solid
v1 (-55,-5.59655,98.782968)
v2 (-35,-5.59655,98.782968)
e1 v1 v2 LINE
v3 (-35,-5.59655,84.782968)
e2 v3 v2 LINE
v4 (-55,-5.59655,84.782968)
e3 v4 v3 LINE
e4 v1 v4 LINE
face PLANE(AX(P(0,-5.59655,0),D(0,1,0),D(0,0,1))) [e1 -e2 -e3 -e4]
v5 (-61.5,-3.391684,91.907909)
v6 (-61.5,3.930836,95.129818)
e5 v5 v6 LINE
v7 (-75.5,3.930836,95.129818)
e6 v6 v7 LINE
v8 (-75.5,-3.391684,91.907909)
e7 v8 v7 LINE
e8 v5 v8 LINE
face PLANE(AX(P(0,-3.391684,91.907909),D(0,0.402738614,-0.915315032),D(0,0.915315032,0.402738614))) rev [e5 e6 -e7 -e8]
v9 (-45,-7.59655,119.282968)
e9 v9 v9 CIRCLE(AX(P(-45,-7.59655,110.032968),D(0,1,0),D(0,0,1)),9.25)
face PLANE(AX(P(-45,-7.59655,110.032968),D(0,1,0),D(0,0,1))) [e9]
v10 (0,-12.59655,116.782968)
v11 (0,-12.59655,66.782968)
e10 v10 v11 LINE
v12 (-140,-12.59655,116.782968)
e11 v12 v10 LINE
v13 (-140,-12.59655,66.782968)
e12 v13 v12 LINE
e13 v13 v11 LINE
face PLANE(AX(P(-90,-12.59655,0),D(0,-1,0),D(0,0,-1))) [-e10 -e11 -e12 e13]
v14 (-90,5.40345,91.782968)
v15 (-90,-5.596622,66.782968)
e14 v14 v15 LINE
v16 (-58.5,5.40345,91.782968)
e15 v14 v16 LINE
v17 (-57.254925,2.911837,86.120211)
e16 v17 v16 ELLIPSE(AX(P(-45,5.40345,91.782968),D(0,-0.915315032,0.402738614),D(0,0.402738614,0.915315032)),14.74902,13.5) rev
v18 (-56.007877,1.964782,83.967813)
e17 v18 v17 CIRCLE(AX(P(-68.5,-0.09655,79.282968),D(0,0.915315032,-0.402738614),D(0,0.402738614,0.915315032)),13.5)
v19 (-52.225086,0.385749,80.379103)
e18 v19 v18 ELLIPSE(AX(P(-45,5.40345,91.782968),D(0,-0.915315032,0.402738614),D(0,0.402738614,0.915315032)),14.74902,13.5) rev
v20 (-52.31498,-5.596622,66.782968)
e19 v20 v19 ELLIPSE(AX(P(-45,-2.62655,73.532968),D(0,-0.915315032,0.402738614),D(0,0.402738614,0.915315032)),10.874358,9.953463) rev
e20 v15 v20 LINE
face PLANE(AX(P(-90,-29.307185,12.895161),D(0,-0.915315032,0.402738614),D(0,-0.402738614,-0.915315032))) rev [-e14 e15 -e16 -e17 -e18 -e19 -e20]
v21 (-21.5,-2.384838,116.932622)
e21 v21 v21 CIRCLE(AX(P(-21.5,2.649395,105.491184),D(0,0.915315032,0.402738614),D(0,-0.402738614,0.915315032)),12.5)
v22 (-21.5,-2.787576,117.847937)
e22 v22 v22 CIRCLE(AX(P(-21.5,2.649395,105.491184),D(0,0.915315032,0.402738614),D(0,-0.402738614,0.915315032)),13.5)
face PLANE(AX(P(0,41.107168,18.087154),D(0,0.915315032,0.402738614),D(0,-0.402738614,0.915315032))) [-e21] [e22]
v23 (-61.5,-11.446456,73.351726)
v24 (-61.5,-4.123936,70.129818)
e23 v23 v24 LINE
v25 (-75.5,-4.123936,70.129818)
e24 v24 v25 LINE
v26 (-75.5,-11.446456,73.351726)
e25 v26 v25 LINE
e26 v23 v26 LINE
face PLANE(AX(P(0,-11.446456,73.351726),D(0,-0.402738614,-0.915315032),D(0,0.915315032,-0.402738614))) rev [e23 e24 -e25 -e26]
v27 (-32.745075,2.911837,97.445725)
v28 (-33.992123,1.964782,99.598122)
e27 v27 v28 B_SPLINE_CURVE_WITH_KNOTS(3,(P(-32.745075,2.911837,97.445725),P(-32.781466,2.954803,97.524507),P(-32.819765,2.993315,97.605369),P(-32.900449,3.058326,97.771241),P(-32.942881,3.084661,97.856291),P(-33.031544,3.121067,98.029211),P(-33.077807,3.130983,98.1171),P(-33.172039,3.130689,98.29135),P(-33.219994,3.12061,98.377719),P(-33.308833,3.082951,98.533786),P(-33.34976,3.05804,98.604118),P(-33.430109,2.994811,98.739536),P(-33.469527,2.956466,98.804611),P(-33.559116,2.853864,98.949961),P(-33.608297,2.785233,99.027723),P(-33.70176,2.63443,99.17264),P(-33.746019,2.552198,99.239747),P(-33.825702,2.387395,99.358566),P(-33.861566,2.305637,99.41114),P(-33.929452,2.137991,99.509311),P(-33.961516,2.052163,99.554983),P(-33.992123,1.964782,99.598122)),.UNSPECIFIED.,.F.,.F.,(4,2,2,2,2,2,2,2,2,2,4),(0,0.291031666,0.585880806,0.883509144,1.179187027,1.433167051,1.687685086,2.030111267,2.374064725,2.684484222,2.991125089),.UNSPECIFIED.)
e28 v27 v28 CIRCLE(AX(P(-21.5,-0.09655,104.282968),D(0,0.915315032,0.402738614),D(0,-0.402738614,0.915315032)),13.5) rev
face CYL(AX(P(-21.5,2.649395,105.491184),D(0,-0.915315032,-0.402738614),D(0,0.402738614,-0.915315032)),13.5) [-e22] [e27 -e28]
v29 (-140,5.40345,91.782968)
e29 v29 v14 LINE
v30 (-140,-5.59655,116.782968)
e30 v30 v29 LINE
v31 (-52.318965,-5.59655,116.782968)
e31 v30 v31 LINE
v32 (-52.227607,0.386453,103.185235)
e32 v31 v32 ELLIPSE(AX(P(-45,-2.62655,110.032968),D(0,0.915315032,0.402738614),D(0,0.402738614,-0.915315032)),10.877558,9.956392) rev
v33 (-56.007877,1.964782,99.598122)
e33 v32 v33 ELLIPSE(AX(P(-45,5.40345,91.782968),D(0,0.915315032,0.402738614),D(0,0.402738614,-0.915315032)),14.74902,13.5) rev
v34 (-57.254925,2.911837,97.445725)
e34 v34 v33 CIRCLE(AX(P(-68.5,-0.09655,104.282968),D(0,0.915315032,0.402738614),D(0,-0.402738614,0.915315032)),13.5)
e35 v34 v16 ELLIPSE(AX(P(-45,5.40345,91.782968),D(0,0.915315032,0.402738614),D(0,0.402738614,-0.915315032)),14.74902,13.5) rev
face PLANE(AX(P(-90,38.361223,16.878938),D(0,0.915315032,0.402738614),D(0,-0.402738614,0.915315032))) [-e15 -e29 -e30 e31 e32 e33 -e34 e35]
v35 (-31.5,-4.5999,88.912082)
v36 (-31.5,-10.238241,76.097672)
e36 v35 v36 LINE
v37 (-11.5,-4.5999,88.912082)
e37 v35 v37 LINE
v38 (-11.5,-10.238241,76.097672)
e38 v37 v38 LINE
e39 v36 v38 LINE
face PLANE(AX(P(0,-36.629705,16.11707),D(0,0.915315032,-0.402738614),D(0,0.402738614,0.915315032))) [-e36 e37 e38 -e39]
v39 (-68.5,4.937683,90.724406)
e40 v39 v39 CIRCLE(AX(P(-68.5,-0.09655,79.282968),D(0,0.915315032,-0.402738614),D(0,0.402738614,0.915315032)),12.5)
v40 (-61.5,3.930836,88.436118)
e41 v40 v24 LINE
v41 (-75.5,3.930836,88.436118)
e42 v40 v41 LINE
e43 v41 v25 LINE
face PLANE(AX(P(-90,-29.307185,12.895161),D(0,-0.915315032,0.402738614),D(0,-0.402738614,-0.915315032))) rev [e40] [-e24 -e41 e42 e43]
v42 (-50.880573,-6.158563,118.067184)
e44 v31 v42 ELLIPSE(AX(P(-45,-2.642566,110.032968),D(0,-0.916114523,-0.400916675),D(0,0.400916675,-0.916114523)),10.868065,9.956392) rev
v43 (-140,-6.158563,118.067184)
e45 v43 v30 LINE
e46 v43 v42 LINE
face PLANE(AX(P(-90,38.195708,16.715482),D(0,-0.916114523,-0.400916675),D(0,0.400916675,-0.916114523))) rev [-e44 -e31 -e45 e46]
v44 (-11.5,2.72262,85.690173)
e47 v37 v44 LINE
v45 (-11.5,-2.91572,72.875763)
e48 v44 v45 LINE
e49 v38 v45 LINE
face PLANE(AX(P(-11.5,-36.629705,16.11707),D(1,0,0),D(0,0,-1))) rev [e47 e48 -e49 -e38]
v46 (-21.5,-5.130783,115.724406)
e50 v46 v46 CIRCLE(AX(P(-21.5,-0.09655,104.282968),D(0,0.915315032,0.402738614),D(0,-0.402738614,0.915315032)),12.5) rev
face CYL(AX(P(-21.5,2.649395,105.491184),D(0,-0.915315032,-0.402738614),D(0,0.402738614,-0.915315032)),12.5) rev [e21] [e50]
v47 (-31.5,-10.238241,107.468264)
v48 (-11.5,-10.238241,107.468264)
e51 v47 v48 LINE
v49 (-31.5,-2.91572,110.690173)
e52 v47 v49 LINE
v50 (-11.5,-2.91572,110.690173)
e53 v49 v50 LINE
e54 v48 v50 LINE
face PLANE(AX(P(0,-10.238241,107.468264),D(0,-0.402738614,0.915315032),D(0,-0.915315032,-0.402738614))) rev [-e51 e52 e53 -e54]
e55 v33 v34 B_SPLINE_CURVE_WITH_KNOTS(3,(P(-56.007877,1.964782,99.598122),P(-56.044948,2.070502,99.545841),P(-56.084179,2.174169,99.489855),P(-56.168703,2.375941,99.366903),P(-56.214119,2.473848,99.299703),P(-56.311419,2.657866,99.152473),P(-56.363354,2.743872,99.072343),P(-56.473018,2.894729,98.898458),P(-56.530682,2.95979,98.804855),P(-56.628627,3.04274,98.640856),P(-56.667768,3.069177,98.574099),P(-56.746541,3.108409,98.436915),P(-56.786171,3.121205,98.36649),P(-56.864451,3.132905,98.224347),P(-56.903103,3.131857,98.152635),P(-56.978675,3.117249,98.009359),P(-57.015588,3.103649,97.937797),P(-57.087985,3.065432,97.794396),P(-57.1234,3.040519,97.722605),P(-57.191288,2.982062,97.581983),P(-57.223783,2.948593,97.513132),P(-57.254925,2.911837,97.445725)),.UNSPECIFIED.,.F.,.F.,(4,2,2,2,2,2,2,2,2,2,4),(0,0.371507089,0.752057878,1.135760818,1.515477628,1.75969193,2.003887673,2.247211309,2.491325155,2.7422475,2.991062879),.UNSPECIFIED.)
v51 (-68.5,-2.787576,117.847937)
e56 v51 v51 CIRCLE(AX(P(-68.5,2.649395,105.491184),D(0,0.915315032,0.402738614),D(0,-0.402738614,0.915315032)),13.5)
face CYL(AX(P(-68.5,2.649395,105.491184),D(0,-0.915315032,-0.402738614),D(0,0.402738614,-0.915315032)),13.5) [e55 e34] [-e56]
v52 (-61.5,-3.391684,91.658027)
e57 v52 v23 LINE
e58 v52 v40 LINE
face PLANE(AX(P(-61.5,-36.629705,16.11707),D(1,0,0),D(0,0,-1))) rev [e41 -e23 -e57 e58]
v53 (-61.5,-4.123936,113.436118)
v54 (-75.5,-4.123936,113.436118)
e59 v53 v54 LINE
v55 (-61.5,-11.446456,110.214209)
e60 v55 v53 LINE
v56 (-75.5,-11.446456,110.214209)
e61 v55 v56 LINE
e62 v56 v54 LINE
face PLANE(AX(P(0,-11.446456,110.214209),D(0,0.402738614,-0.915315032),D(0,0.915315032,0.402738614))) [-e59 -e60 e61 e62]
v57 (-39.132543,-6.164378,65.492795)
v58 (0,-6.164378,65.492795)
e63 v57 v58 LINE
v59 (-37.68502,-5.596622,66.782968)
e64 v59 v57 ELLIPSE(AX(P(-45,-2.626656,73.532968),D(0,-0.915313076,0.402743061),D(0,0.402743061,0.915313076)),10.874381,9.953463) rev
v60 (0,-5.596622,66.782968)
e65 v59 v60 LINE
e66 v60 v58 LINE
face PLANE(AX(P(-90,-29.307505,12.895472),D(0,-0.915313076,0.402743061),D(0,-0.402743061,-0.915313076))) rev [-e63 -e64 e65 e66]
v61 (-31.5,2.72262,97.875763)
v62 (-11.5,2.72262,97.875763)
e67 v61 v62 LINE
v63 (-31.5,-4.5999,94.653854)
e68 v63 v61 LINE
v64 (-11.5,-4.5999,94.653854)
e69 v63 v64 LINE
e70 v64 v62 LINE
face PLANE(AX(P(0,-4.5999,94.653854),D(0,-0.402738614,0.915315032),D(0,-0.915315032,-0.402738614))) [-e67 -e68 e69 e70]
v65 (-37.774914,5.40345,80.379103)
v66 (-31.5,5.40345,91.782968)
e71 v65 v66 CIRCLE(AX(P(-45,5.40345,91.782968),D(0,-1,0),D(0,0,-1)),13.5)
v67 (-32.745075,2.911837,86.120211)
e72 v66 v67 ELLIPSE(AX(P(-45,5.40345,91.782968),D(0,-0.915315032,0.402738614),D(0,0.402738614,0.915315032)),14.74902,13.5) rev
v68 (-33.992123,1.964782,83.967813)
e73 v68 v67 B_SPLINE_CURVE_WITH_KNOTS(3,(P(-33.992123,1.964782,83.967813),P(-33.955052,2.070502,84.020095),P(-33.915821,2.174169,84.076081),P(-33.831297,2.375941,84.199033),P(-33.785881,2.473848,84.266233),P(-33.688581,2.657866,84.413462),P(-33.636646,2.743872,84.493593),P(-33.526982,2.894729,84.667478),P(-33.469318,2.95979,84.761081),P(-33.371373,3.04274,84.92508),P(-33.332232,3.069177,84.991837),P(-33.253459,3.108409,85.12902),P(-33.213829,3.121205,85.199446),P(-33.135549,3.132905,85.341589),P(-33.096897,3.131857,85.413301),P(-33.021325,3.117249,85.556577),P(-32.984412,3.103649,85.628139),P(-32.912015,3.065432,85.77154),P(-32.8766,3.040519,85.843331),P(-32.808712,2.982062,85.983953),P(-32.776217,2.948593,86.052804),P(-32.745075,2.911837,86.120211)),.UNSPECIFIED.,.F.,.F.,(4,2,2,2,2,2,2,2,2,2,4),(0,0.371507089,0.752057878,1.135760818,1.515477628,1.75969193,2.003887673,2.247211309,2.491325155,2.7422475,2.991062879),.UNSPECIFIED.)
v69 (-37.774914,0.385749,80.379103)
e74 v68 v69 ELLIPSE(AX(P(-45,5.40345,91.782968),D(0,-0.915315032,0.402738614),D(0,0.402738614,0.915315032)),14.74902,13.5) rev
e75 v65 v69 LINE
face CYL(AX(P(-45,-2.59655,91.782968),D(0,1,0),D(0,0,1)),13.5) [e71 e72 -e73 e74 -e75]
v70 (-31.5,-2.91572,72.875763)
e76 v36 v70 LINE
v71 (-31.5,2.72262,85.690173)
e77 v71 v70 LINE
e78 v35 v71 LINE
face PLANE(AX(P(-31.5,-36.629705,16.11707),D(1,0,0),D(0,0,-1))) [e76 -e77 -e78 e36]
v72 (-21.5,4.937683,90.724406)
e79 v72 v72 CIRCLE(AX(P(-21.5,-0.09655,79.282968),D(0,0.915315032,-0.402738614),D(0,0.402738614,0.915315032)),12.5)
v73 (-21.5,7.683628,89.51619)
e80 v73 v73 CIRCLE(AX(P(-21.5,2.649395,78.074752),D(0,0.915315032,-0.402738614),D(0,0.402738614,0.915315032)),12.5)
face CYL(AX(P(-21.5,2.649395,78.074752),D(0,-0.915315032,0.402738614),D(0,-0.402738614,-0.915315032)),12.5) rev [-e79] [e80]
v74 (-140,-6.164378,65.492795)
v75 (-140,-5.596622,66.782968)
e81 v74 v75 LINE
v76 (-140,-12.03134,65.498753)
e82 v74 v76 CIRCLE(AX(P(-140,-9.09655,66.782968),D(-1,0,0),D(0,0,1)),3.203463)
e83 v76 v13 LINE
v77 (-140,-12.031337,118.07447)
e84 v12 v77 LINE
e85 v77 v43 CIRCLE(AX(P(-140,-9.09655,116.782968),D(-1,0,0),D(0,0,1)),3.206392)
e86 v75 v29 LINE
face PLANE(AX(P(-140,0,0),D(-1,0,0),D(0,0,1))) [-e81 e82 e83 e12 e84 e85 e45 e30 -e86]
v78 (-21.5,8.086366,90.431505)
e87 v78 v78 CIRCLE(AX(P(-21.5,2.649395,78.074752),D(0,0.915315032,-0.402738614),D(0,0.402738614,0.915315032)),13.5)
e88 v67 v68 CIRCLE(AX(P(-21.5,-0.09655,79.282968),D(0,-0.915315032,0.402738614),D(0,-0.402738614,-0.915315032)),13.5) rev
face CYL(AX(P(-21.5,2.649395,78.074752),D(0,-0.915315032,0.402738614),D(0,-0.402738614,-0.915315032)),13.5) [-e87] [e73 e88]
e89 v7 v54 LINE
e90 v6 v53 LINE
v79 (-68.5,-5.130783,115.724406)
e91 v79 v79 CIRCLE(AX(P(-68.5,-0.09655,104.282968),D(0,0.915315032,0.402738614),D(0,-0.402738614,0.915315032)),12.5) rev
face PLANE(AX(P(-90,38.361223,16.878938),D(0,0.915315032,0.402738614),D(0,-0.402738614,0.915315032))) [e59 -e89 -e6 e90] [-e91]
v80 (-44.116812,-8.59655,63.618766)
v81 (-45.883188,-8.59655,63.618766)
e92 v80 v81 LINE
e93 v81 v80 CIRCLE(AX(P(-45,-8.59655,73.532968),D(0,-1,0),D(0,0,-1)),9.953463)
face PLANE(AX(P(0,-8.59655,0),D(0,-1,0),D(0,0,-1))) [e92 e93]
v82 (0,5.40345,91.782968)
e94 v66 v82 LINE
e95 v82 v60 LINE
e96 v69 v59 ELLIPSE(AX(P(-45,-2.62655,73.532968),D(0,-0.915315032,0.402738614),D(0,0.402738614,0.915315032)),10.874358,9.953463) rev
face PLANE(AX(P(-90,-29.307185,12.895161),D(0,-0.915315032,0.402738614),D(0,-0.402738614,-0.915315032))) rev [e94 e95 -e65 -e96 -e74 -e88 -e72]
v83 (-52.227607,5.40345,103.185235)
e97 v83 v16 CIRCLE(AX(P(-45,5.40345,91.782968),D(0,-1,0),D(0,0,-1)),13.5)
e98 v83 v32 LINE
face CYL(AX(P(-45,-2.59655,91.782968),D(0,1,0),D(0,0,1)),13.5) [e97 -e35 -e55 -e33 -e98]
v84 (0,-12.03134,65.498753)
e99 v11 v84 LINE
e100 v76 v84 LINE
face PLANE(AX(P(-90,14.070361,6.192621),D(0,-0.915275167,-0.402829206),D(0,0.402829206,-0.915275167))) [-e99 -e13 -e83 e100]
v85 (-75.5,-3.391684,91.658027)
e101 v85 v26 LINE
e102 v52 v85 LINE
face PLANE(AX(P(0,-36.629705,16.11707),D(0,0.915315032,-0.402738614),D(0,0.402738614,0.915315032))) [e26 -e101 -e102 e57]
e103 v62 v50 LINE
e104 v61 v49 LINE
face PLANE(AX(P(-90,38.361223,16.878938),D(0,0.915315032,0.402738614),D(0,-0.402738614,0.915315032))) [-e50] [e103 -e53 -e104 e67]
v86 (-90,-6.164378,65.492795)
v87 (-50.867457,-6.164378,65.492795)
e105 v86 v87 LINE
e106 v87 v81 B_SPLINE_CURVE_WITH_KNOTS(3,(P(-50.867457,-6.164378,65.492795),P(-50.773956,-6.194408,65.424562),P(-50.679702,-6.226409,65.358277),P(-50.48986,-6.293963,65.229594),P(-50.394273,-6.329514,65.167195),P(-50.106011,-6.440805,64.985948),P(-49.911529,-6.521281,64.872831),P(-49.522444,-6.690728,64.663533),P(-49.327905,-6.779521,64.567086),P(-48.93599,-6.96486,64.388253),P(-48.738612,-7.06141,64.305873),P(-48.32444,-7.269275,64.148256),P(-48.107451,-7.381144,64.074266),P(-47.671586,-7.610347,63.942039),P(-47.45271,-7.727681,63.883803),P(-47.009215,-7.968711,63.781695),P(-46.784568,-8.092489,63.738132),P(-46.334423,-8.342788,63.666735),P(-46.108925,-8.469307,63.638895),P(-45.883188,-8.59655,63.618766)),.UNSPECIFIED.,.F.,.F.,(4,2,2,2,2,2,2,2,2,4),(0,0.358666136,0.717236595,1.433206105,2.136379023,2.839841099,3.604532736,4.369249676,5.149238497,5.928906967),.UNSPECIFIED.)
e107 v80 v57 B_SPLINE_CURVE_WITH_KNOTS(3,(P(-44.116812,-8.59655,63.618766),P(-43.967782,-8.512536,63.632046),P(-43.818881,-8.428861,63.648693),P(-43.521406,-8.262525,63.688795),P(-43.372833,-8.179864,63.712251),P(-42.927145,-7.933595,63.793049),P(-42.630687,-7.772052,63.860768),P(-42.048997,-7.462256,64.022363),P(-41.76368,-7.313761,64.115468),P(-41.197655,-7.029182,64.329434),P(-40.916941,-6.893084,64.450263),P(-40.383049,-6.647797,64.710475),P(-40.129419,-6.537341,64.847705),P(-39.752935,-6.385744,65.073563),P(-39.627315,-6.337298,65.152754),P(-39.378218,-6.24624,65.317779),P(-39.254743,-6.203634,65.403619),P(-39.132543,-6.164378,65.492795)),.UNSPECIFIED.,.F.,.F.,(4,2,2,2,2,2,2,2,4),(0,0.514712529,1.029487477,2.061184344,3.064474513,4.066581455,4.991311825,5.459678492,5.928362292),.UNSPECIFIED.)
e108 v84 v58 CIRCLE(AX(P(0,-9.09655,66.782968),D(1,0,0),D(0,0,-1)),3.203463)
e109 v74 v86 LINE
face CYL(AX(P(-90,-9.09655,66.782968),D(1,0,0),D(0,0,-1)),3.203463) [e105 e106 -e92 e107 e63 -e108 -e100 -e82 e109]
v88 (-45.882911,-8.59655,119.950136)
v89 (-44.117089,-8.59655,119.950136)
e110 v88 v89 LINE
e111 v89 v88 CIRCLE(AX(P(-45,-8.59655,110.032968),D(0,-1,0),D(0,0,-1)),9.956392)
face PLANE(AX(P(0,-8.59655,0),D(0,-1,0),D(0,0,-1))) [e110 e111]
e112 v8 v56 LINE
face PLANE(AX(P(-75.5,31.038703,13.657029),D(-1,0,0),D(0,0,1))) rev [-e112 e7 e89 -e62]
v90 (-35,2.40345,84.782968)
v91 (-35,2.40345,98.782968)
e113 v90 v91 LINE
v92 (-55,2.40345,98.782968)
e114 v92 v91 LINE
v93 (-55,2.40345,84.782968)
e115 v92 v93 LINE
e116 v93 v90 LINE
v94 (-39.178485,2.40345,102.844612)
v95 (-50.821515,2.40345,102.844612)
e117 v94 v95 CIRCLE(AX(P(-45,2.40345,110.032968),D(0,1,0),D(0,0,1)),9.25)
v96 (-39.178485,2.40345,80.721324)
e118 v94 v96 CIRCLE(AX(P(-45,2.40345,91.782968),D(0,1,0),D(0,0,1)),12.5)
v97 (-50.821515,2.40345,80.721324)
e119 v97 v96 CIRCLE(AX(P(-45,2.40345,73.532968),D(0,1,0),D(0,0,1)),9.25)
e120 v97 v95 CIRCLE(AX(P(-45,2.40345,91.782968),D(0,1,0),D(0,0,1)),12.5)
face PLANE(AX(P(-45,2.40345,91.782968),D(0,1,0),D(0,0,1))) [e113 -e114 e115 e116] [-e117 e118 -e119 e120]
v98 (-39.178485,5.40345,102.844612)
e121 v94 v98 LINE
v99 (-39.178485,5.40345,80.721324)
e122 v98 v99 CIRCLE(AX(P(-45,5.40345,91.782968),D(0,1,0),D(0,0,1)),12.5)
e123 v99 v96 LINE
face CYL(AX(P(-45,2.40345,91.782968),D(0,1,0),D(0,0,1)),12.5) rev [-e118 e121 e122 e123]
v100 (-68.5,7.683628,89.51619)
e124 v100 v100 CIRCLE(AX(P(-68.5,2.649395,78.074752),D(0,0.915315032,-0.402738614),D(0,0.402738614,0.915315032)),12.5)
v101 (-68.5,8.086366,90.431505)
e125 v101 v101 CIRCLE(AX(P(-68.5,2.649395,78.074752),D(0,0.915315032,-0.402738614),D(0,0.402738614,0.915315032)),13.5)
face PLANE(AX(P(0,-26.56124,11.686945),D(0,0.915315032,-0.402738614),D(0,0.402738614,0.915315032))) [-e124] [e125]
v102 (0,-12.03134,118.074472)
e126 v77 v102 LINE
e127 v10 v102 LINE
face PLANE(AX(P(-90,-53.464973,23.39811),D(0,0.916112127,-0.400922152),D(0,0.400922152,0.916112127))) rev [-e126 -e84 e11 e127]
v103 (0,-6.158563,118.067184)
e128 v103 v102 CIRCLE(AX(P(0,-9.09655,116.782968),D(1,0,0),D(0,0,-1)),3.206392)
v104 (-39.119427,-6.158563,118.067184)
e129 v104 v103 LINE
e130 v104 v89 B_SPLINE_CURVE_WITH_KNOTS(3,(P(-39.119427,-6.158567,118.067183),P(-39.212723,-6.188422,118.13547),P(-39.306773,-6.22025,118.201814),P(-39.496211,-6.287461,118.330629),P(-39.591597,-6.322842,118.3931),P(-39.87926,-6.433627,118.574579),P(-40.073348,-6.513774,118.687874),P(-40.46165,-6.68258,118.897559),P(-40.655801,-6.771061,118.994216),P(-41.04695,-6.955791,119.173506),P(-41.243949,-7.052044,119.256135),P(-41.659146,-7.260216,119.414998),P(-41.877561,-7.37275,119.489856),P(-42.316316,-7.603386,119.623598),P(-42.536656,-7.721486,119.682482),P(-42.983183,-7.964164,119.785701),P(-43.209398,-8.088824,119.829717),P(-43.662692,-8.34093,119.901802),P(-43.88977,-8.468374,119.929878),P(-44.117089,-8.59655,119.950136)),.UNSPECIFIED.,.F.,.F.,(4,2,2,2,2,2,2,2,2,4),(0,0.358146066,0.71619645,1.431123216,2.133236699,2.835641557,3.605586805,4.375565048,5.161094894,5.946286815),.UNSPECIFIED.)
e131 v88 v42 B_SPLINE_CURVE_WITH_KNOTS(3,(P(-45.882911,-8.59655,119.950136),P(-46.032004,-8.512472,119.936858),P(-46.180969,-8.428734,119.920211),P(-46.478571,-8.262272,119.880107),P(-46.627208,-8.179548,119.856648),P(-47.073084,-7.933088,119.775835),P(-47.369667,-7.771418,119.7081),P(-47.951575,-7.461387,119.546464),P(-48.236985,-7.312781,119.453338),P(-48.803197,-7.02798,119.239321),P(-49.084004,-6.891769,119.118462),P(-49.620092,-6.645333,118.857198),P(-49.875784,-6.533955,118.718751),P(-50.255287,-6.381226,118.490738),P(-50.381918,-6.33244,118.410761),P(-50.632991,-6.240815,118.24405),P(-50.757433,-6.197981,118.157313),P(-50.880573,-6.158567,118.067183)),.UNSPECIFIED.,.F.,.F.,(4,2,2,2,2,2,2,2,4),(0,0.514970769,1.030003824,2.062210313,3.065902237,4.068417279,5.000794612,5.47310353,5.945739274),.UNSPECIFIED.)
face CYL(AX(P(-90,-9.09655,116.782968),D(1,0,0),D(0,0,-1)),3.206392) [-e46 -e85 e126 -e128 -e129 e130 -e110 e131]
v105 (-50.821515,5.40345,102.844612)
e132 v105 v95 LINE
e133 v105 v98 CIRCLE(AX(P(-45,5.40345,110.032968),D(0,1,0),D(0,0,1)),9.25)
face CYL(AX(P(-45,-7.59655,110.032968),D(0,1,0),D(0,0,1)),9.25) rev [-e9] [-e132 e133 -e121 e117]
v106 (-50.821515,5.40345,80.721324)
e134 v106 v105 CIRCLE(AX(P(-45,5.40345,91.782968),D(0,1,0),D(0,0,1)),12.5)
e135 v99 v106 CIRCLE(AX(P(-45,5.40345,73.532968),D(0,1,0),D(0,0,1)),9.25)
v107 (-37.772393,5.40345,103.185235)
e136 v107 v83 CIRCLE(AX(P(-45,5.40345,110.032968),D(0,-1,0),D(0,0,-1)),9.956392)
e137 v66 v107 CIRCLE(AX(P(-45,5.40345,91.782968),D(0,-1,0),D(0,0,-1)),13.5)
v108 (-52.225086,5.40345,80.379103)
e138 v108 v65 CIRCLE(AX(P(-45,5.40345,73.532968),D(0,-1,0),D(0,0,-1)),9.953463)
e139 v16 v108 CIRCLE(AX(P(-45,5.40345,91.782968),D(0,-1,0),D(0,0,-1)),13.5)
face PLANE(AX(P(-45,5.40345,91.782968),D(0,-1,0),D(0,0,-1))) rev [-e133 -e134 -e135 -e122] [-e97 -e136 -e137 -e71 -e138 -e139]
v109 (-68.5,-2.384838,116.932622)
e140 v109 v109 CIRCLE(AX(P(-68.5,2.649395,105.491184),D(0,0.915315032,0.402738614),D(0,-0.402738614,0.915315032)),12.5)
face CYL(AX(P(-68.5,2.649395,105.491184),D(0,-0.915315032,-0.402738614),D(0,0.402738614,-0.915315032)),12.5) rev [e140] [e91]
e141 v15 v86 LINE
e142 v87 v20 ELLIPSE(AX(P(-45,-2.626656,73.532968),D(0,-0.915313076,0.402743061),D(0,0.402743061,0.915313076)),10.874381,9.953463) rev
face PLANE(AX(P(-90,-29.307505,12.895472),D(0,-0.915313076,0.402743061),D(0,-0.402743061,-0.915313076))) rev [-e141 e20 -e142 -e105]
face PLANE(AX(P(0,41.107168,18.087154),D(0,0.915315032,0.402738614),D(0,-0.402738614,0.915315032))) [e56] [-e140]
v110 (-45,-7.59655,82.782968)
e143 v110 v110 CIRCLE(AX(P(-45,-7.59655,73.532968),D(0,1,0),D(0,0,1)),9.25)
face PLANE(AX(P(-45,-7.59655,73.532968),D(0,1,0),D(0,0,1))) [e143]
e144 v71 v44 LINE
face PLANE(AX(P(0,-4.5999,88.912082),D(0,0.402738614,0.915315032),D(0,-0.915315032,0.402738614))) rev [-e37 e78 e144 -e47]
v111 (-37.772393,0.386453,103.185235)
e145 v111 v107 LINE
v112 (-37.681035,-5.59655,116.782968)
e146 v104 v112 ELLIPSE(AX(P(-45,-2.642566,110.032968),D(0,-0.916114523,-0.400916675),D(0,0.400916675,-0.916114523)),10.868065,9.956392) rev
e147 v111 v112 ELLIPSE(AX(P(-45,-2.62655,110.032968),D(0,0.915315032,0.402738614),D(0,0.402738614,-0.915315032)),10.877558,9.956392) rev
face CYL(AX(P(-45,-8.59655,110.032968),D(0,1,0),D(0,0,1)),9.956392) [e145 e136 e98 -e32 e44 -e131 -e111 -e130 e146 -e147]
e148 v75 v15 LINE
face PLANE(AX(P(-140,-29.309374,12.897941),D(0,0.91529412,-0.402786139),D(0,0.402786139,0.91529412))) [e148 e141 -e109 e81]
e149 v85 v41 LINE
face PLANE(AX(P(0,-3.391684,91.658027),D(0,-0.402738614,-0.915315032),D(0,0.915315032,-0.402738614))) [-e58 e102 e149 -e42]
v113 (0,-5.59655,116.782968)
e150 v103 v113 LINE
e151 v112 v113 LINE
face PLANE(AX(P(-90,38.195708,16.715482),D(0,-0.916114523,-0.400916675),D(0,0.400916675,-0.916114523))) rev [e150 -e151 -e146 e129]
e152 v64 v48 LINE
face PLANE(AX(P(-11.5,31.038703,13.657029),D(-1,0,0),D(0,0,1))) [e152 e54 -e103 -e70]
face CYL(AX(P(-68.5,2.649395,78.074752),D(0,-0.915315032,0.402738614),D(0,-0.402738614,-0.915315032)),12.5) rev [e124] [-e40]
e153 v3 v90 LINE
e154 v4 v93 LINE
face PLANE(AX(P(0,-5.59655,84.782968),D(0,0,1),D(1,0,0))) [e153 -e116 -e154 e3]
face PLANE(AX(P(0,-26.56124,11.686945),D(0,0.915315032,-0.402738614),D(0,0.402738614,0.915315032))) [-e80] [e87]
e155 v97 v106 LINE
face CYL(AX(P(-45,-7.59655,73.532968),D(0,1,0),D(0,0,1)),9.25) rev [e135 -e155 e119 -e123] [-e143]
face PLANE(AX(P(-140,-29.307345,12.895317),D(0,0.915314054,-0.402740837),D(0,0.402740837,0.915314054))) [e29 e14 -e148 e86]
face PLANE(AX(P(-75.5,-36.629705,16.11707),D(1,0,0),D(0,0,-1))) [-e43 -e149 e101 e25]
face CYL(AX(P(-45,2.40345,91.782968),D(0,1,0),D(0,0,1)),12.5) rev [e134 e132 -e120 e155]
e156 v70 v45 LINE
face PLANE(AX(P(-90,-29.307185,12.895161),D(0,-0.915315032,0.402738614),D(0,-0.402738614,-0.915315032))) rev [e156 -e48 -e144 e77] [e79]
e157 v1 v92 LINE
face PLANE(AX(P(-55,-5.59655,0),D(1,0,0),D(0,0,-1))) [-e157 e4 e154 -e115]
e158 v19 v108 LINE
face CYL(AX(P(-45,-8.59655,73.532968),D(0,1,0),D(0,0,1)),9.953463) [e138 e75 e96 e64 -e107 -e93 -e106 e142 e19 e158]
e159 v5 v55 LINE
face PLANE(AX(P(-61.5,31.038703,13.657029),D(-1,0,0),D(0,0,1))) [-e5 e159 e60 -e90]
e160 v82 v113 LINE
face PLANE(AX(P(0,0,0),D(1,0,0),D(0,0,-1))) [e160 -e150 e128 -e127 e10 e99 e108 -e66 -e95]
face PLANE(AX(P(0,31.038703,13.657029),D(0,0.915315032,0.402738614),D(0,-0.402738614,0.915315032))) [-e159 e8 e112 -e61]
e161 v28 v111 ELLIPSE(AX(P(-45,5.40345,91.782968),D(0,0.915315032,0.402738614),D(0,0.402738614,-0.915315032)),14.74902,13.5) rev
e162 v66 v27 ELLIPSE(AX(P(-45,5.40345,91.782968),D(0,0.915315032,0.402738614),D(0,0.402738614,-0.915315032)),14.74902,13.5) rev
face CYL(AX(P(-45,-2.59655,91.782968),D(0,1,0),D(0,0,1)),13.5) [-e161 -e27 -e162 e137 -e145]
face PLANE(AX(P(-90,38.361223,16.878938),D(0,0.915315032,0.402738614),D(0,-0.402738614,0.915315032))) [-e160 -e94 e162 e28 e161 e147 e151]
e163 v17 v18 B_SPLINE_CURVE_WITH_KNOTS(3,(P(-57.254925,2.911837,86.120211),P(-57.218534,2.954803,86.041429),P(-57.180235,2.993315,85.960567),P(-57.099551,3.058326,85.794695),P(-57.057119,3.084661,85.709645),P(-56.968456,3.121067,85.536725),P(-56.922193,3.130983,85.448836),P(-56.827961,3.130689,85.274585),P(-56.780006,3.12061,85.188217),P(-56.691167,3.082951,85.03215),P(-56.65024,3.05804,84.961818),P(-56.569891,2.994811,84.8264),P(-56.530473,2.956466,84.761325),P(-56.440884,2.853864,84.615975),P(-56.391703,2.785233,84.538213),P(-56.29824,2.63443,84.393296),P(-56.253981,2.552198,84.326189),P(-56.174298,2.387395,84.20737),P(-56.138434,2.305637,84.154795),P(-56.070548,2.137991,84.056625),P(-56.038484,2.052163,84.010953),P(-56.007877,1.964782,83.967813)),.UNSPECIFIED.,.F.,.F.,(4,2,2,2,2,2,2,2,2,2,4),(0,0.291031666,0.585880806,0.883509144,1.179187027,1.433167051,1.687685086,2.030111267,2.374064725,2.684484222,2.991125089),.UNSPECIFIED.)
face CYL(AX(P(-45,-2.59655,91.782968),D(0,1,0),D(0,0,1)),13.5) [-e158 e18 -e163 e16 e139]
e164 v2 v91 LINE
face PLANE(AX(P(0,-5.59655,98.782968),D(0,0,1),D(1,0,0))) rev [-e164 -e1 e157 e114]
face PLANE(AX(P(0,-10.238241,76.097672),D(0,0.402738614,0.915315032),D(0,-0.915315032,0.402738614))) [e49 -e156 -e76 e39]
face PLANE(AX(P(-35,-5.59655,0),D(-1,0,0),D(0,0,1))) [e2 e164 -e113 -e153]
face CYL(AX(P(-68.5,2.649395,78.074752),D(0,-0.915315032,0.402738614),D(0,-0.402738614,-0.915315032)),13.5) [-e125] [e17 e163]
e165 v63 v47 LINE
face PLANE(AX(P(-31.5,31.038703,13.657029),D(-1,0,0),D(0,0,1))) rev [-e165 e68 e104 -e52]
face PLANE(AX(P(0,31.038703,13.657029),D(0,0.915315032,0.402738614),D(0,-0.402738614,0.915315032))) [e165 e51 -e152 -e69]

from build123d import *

# Parameters (mm, degrees)
SKETCH1_W            = 50
SKETCH1_H            = 7
BOSS_EXTRUDE1_DEPTH  = 90
SKETCH2_R            = 13.5
BOSS_EXTRUDE2_DEPTH  = 8
BOSS_EXTRUDE3_DEPTH  = 3
BOSS_EXTRUDE4_DEPTH  = 3
SKETCH5_R            = 12.5
CUT_EXTRUDE1_DEPTH   = 3
SKETCH6_W            = 20
SKETCH6_H            = 14
SKETCH6_W_2          = 14
SKETCH6_H_2          = 20
CUT_EXTRUDE3_DEPTH   = 8
SKETCH7_W            = 20
SKETCH7_H            = 14
SKETCH7_W_2          = 14
SKETCH7_H_2          = 20
CUT_EXTRUDE4_DEPTH   = 8
SKETCH8_W            = 20
SKETCH8_H            = 14
CUT_EXTRUDE5_DEPTH   = 8
BOSS_EXTRUDE6_START  = -90
BOSS_EXTRUDE6_DEPTH  = 90
SKETCH12_R           = 9.956392443
SKETCH12_R_2         = 9.25
SKETCH12_R_3         = 9.953463084
BOSS_EXTRUDE7_DEPTH  = 14
SKETCH13_R           = 12.5
CUT_EXTRUDE6_DEPTH   = 3
SKETCH14_R           = 9.25
BOSS_EXTRUDE8_DEPTH  = 13
SKETCH15_R           = 9.25
CUT_EXTRUDE7_DEPTH   = 13
BOSS_EXTRUDE11_DEPTH = 50


with BuildPart() as part:
    # Sketch1 → Boss-Extrude1 (new body)
    with BuildSketch(Plane(origin=(0, 0, 0), x_dir=(0, 0, -1), z_dir=(1, 0, 0))):
        Polygon((-91.782967909, 5.403450034), (-91.782967909, -5.596549966), (-66.782967909, -5.596549966), align=None)
        with Locations((-91.782967909, -9.096549966)):
            Rectangle(SKETCH1_W, SKETCH1_H)
        Polygon((-116.782967909, -5.596549966), (-91.782967909, -5.596549966), (-91.782967909, 5.403450034), align=None)
    extrude(amount=-BOSS_EXTRUDE1_DEPTH)

    # Sketch2 → Boss-Extrude2 (add)
    with BuildSketch(Plane(origin=(0, 5.403450034, 0), x_dir=(-1, 0, 0), z_dir=(0, -1, 0))):
        with Locations((45, -91.782967909)):
            Circle(SKETCH2_R)
    extrude(amount=BOSS_EXTRUDE2_DEPTH)

    # Sketch3 → Boss-Extrude3 (add)
    with BuildSketch(Plane(origin=(0, 38.361223118, 16.878938172), x_dir=(1, 0, 0), z_dir=(0, 0.9153150324227656, 0.402738614266017))):
        with BuildLine():
            Line((-58.5, -87.990652552), (-58.5, -86.421473978))
            ThreePointArc((-58.5, -86.421473978), (-82, -95.490652552), (-58.5, -104.559831125))
            Line((-58.5, -104.559831125), (-58.5, -102.990652552))
            ThreePointArc((-58.5, -102.990652552), (-81, -95.490652552), (-58.5, -87.990652552))
        make_face()
        with BuildLine():
            ThreePointArc((-57.25492495, -88.020827445), (-57.847404713, -87.19775115), (-58.5, -86.421473978))
            Line((-58.5, -86.421473978), (-58.5, -87.990652552))
            ThreePointArc((-58.5, -87.990652552), (-56.641458774, -91.537805477), (-56, -95.490652552))
            ThreePointArc((-56, -95.490652552), (-56.641458774, -99.443499627), (-58.5, -102.990652552))
            Line((-58.5, -102.990652552), (-58.5, -104.559831125))
            ThreePointArc((-58.5, -104.559831125), (-55.905358282, -100.351208076), (-55, -95.490652552))
            ThreePointArc((-55, -95.490652552), (-55.254365648, -92.882363724), (-56.007877127, -90.37236513))
            add(Edge.make_bspline(
                [(-57.25492495, -88.020827445), (-56.730976667, -89.259625667), (-56.007877127, -90.37236513)],
                knots=[2.018456538, 2.018456538, 2.018456538, 2.19652694, 2.19652694, 2.19652694], degree=2, weights=[0.880634053, 0.866355929, 0.859605864]))
        make_face()
        with BuildLine():
            ThreePointArc((-56.007877127, -90.37236513), (-56.573304159, -89.165786836), (-57.25492495, -88.020827445))
            add(Edge.make_bspline(
                [(-57.25492495, -88.020827445), (-56.730976667, -89.259625667), (-56.007877127, -90.37236513)],
                knots=[2.018456538, 2.018456538, 2.018456538, 2.19652694, 2.19652694, 2.19652694], degree=2, weights=[0.880634053, 0.866355929, 0.859605864]))
        make_face()
        with BuildLine():
            ThreePointArc((-8, -95.490652552), (-16.639444476, -82.896010834), (-31.5, -86.421473978))
            Line((-31.5, -86.421473978), (-31.5, -87.990652552))
            ThreePointArc((-31.5, -87.990652552), (-17.547152925, -83.632111326), (-9, -95.490652552))
            ThreePointArc((-9, -95.490652552), (-17.547152925, -107.349193777), (-31.5, -102.990652552))
            Line((-31.5, -102.990652552), (-31.5, -104.559831125))
            ThreePointArc((-31.5, -104.559831125), (-16.639444476, -108.08529427), (-8, -95.490652552))
        make_face()
        with BuildLine():
            Line((-31.5, -87.990652552), (-31.5, -86.421473978))
            ThreePointArc((-31.5, -86.421473978), (-32.152595287, -87.19775115), (-32.74507505, -88.020827445))
            add(Edge.make_bspline(
                [(-33.992122873, -90.37236513), (-33.269023333, -89.259625667), (-32.74507505, -88.020827445)],
                knots=[4.086658367, 4.086658367, 4.086658367, 4.264728769, 4.264728769, 4.264728769], degree=2, weights=[0.859605864, 0.866355929, 0.880634053]))
            ThreePointArc((-33.992122873, -90.37236513), (-34.796426049, -97.826258325), (-31.5, -104.559831125))
            Line((-31.5, -104.559831125), (-31.5, -102.990652552))
            ThreePointArc((-31.5, -102.990652552), (-34, -95.490652552), (-31.5, -87.990652552))
        make_face()
        with BuildLine():
            add(Edge.make_bspline(
                [(-33.992122873, -90.37236513), (-33.269023333, -89.259625667), (-32.74507505, -88.020827445)],
                knots=[4.086658367, 4.086658367, 4.086658367, 4.264728769, 4.264728769, 4.264728769], degree=2, weights=[0.859605864, 0.866355929, 0.880634053]))
            ThreePointArc((-32.74507505, -88.020827445), (-33.426695841, -89.165786836), (-33.992122873, -90.37236513))
        make_face()
    extrude(amount=BOSS_EXTRUDE3_DEPTH)

    # Sketch4 → Boss-Extrude4 (add)
    with BuildSketch(Plane(origin=(0, -29.307184857, 12.895161337), x_dir=(1, 0, 0), z_dir=(0, 0.9153150324227658, -0.4027386142660168))):
        with BuildLine():
            ThreePointArc((-58.5, -63.460829369), (-82, -72.530007942), (-58.5, -81.599186516))
            Line((-58.5, -81.599186516), (-58.5, -80.030007942))
            ThreePointArc((-58.5, -80.030007942), (-81, -72.530007942), (-58.5, -65.030007942))
            Line((-58.5, -65.030007942), (-58.5, -63.460829369))
        make_face()
        with BuildLine():
            add(Edge.make_bspline(
                [(-56.007877127, -77.648295364), (-56.730976667, -78.761034827), (-57.25492495, -79.999833049)],
                knots=[4.086658367, 4.086658367, 4.086658367, 4.264728769, 4.264728769, 4.264728769], degree=2, weights=[0.859605864, 0.866355929, 0.880634053]))
            ThreePointArc((-56.007877127, -77.648295364), (-55.254365648, -75.13829677), (-55, -72.530007942))
            ThreePointArc((-55, -72.530007942), (-55.905358282, -67.669452418), (-58.5, -63.460829369))
            Line((-58.5, -63.460829369), (-58.5, -65.030007942))
            ThreePointArc((-58.5, -65.030007942), (-56.641458774, -68.577160867), (-56, -72.530007942))
            ThreePointArc((-56, -72.530007942), (-56.641458774, -76.482855017), (-58.5, -80.030007942))
            Line((-58.5, -80.030007942), (-58.5, -81.599186516))
            ThreePointArc((-58.5, -81.599186516), (-57.847404713, -80.822909344), (-57.25492495, -79.999833049))
        make_face()
        with BuildLine():
            ThreePointArc((-57.25492495, -79.999833049), (-56.573304159, -78.854873658), (-56.007877127, -77.648295364))
            add(Edge.make_bspline(
                [(-56.007877127, -77.648295364), (-56.730976667, -78.761034827), (-57.25492495, -79.999833049)],
                knots=[4.086658367, 4.086658367, 4.086658367, 4.264728769, 4.264728769, 4.264728769], degree=2, weights=[0.859605864, 0.866355929, 0.880634053]))
        make_face()
        with BuildLine():
            Line((-31.5, -80.030007942), (-31.5, -81.599186516))
            ThreePointArc((-31.5, -81.599186516), (-16.639444476, -85.12464966), (-8, -72.530007942))
            ThreePointArc((-8, -72.530007942), (-16.639444476, -59.935366224), (-31.5, -63.460829369))
            Line((-31.5, -63.460829369), (-31.5, -65.030007942))
            ThreePointArc((-31.5, -65.030007942), (-17.547152925, -60.671466717), (-9, -72.530007942))
            ThreePointArc((-9, -72.530007942), (-17.547152925, -84.388549168), (-31.5, -80.030007942))
        make_face()
        with BuildLine():
            ThreePointArc((-32.74507505, -79.999833049), (-32.152595287, -80.822909344), (-31.5, -81.599186516))
            Line((-31.5, -81.599186516), (-31.5, -80.030007942))
            ThreePointArc((-31.5, -80.030007942), (-34, -72.530007942), (-31.5, -65.030007942))
            Line((-31.5, -65.030007942), (-31.5, -63.460829369))
            ThreePointArc((-31.5, -63.460829369), (-34.796426049, -70.194402169), (-33.992122873, -77.648295364))
            add(Edge.make_bspline(
                [(-32.74507505, -79.999833049), (-33.269023333, -78.761034827), (-33.992122873, -77.648295364)],
                knots=[2.018456538, 2.018456538, 2.018456538, 2.19652694, 2.19652694, 2.19652694], degree=2, weights=[0.880634053, 0.866355929, 0.859605864]))
        make_face()
        with BuildLine():
            ThreePointArc((-33.992122873, -77.648295364), (-33.426695841, -78.854873658), (-32.74507505, -79.999833049))
            add(Edge.make_bspline(
                [(-32.74507505, -79.999833049), (-33.269023333, -78.761034827), (-33.992122873, -77.648295364)],
                knots=[2.018456538, 2.018456538, 2.018456538, 2.19652694, 2.19652694, 2.19652694], degree=2, weights=[0.880634053, 0.866355929, 0.859605864]))
        make_face()
    extrude(amount=BOSS_EXTRUDE4_DEPTH)

    # Sketch5 → Cut-Extrude1 (cut)
    with BuildSketch(Plane(origin=(0, 5.403450034, 0), x_dir=(1, 0, 0), z_dir=(0, 1, 0))):
        with Locations(Location((-45, -91.782967909, 0), (0, 0, 270))):
            Circle(SKETCH5_R)
    extrude(amount=-CUT_EXTRUDE1_DEPTH, mode=Mode.SUBTRACT)

    # Sketch6 → Cut-Extrude3 (cut)
    with BuildSketch(Plane(origin=(0, 38.361223118, 16.878938172), x_dir=(1, 0, 0), z_dir=(0, 0.9153150324227656, 0.402738614266017))):
        with Locations((-21.5, -95.490652552)):
            Rectangle(SKETCH6_W, SKETCH6_H)
        with Locations((-68.5, -95.490652552)):
            Rectangle(SKETCH6_W_2, SKETCH6_H_2)
    extrude(amount=-CUT_EXTRUDE3_DEPTH, mode=Mode.SUBTRACT)

    # Sketch7 → Cut-Extrude4 (cut)
    with BuildSketch(Plane(origin=(0, -29.307184857, 12.895161337), x_dir=(1, 0, 0), z_dir=(0, 0.9153150324227658, -0.4027386142660168))):
        with Locations((-21.5, -72.530007942)):
            Rectangle(SKETCH7_W, SKETCH7_H)
        with Locations((-68.5, -72.530007942)):
            Rectangle(SKETCH7_W_2, SKETCH7_H_2)
    extrude(amount=-CUT_EXTRUDE4_DEPTH, mode=Mode.SUBTRACT)

    # Sketch8 → Cut-Extrude5 (cut)
    with BuildSketch(Plane(origin=(0, 2.403450034, 0), x_dir=(1, 0, 0), z_dir=(0, 1, 0))):
        with Locations((-45, -91.782967909)):
            Rectangle(SKETCH8_W, SKETCH8_H)
    extrude(amount=-CUT_EXTRUDE5_DEPTH, mode=Mode.SUBTRACT)

    # Boss-Extrude6: read off the stored shape, not the designer's step
    # Boss-Extrude6 outline → Boss-Extrude6 (add)
    with BuildSketch(Plane(origin=(0, 0, 0), x_dir=(0, 0, -1), z_dir=(1, 0, 0)).offset(BOSS_EXTRUDE6_START)):
        with BuildLine():
            Line((-116.782967909, -5.596549966), (-118.067182683, -6.158566829))
            ThreePointArc((-118.067182683, -6.158566829), (-119.989357883, -9.092571086), (-118.074470332, -12.031336839))
            Line((-118.074470332, -12.031336839), (-116.782967909, -12.596549966))
            Line((-116.782967909, -12.596549966), (-116.782967909, -5.596549966))
        make_face()
        with BuildLine():
            Line((-65.492795381, -6.164378317), (-66.782994627, -5.596683168))
            Line((-66.782994627, -5.596683168), (-66.782967909, -12.596549966))
            Line((-66.782967909, -12.596549966), (-65.498754212, -12.031336314))
            ThreePointArc((-65.498754212, -12.031336314), (-63.579506477, -9.099803591), (-65.492795381, -6.164378317))
        make_face()
    extrude(amount=BOSS_EXTRUDE6_DEPTH)

    # Sketch12 → Boss-Extrude7 (add)
    # profile 1 of 2: a face of its own
    with BuildSketch(Plane(origin=(0, 5.403450034, 0), x_dir=(-1, 0, 0), z_dir=(0, -1, 0))):
        with Locations((45, -110.032967909)):
            Circle(SKETCH12_R)
        with Locations((45, -110.032967909)):
            Circle(SKETCH12_R_2, mode=Mode.SUBTRACT)
    # profile 2 of 2: a face of its own
    with BuildSketch(Plane(origin=(0, 5.403450034, 0), x_dir=(-1, 0, 0), z_dir=(0, -1, 0))):
        with Locations((45, -73.532967909)):
            Circle(SKETCH12_R_3)
        with Locations((45, -73.532967909)):
            Circle(SKETCH12_R_2, mode=Mode.SUBTRACT)
    extrude(amount=BOSS_EXTRUDE7_DEPTH)

    # Sketch13 → Cut-Extrude6 (cut)
    with BuildSketch(Plane(origin=(0, 5.403450034, 0), x_dir=(1, 0, 0), z_dir=(0, 1, 0))):
        with Locations(Location((-45, -91.782967909, 0), (0, 0, 270))):
            Circle(SKETCH13_R)
    extrude(amount=-CUT_EXTRUDE6_DEPTH, mode=Mode.SUBTRACT)


with BuildPart() as boss_extrude8_tool:
    # Sketch14 → Boss-Extrude8 (new body)
    with BuildSketch(Plane(origin=(0, 5.403450034, 0), x_dir=(1, 0, 0), z_dir=(0, 1, 0))):
        with Locations((-45, -110.032967909)):
            Circle(SKETCH14_R)
        with Locations((-45, -73.532967909)):
            Circle(SKETCH14_R)
    extrude(amount=-BOSS_EXTRUDE8_DEPTH)


with BuildPart() as part_1:
    add(part.part)


with BuildPart() as part_2:
    # Boss-Extrude8: joined with boss_extrude8_tool
    add(part_1.part.fuse(boss_extrude8_tool.part, tol=0.00001))

    # Sketch15 → Cut-Extrude7 (cut)
    with BuildSketch(Plane(origin=(0, 5.403450034, 0), x_dir=(1, 0, 0), z_dir=(0, 1, 0))):
        with Locations(Location((-45, -110.032967909, 0), (0, 0, 270))):
            Circle(SKETCH15_R)
        with Locations(Location((-45, -73.532967909, 0), (0, 0, 270))):
            Circle(SKETCH15_R)
    extrude(amount=-CUT_EXTRUDE7_DEPTH, mode=Mode.SUBTRACT)

    # Boss-Extrude11: read off the stored shape, not the designer's step
    # Boss-Extrude11 outline → Boss-Extrude11 (add)
    with BuildSketch(Plane.ZY.offset(90)):
        with BuildLine():
            ThreePointArc((65.492795381, -6.164378317), (63.579506477, -9.099803591), (65.498754212, -12.031336314))
            Line((65.498754212, -12.031336314), (66.782967909, -12.596549966))
            Line((66.782967909, -12.596549966), (116.782967909, -12.596549966))
            Line((116.782967909, -12.596549966), (118.074470332, -12.031336839))
            ThreePointArc((118.074470332, -12.031336839), (119.989357883, -9.092571086), (118.067182683, -6.158566829))
            Line((118.067182683, -6.158566829), (116.782967909, -5.596549966))
            Line((116.782967909, -5.596549966), (91.782967909, 5.403450034))
            Line((91.782967909, 5.403450034), (66.782967909, -5.596622445))
            Line((66.782967909, -5.596622445), (65.492795381, -6.164378317))
        make_face()
    extrude(amount=BOSS_EXTRUDE11_DEPTH)


solid = part_2.part
